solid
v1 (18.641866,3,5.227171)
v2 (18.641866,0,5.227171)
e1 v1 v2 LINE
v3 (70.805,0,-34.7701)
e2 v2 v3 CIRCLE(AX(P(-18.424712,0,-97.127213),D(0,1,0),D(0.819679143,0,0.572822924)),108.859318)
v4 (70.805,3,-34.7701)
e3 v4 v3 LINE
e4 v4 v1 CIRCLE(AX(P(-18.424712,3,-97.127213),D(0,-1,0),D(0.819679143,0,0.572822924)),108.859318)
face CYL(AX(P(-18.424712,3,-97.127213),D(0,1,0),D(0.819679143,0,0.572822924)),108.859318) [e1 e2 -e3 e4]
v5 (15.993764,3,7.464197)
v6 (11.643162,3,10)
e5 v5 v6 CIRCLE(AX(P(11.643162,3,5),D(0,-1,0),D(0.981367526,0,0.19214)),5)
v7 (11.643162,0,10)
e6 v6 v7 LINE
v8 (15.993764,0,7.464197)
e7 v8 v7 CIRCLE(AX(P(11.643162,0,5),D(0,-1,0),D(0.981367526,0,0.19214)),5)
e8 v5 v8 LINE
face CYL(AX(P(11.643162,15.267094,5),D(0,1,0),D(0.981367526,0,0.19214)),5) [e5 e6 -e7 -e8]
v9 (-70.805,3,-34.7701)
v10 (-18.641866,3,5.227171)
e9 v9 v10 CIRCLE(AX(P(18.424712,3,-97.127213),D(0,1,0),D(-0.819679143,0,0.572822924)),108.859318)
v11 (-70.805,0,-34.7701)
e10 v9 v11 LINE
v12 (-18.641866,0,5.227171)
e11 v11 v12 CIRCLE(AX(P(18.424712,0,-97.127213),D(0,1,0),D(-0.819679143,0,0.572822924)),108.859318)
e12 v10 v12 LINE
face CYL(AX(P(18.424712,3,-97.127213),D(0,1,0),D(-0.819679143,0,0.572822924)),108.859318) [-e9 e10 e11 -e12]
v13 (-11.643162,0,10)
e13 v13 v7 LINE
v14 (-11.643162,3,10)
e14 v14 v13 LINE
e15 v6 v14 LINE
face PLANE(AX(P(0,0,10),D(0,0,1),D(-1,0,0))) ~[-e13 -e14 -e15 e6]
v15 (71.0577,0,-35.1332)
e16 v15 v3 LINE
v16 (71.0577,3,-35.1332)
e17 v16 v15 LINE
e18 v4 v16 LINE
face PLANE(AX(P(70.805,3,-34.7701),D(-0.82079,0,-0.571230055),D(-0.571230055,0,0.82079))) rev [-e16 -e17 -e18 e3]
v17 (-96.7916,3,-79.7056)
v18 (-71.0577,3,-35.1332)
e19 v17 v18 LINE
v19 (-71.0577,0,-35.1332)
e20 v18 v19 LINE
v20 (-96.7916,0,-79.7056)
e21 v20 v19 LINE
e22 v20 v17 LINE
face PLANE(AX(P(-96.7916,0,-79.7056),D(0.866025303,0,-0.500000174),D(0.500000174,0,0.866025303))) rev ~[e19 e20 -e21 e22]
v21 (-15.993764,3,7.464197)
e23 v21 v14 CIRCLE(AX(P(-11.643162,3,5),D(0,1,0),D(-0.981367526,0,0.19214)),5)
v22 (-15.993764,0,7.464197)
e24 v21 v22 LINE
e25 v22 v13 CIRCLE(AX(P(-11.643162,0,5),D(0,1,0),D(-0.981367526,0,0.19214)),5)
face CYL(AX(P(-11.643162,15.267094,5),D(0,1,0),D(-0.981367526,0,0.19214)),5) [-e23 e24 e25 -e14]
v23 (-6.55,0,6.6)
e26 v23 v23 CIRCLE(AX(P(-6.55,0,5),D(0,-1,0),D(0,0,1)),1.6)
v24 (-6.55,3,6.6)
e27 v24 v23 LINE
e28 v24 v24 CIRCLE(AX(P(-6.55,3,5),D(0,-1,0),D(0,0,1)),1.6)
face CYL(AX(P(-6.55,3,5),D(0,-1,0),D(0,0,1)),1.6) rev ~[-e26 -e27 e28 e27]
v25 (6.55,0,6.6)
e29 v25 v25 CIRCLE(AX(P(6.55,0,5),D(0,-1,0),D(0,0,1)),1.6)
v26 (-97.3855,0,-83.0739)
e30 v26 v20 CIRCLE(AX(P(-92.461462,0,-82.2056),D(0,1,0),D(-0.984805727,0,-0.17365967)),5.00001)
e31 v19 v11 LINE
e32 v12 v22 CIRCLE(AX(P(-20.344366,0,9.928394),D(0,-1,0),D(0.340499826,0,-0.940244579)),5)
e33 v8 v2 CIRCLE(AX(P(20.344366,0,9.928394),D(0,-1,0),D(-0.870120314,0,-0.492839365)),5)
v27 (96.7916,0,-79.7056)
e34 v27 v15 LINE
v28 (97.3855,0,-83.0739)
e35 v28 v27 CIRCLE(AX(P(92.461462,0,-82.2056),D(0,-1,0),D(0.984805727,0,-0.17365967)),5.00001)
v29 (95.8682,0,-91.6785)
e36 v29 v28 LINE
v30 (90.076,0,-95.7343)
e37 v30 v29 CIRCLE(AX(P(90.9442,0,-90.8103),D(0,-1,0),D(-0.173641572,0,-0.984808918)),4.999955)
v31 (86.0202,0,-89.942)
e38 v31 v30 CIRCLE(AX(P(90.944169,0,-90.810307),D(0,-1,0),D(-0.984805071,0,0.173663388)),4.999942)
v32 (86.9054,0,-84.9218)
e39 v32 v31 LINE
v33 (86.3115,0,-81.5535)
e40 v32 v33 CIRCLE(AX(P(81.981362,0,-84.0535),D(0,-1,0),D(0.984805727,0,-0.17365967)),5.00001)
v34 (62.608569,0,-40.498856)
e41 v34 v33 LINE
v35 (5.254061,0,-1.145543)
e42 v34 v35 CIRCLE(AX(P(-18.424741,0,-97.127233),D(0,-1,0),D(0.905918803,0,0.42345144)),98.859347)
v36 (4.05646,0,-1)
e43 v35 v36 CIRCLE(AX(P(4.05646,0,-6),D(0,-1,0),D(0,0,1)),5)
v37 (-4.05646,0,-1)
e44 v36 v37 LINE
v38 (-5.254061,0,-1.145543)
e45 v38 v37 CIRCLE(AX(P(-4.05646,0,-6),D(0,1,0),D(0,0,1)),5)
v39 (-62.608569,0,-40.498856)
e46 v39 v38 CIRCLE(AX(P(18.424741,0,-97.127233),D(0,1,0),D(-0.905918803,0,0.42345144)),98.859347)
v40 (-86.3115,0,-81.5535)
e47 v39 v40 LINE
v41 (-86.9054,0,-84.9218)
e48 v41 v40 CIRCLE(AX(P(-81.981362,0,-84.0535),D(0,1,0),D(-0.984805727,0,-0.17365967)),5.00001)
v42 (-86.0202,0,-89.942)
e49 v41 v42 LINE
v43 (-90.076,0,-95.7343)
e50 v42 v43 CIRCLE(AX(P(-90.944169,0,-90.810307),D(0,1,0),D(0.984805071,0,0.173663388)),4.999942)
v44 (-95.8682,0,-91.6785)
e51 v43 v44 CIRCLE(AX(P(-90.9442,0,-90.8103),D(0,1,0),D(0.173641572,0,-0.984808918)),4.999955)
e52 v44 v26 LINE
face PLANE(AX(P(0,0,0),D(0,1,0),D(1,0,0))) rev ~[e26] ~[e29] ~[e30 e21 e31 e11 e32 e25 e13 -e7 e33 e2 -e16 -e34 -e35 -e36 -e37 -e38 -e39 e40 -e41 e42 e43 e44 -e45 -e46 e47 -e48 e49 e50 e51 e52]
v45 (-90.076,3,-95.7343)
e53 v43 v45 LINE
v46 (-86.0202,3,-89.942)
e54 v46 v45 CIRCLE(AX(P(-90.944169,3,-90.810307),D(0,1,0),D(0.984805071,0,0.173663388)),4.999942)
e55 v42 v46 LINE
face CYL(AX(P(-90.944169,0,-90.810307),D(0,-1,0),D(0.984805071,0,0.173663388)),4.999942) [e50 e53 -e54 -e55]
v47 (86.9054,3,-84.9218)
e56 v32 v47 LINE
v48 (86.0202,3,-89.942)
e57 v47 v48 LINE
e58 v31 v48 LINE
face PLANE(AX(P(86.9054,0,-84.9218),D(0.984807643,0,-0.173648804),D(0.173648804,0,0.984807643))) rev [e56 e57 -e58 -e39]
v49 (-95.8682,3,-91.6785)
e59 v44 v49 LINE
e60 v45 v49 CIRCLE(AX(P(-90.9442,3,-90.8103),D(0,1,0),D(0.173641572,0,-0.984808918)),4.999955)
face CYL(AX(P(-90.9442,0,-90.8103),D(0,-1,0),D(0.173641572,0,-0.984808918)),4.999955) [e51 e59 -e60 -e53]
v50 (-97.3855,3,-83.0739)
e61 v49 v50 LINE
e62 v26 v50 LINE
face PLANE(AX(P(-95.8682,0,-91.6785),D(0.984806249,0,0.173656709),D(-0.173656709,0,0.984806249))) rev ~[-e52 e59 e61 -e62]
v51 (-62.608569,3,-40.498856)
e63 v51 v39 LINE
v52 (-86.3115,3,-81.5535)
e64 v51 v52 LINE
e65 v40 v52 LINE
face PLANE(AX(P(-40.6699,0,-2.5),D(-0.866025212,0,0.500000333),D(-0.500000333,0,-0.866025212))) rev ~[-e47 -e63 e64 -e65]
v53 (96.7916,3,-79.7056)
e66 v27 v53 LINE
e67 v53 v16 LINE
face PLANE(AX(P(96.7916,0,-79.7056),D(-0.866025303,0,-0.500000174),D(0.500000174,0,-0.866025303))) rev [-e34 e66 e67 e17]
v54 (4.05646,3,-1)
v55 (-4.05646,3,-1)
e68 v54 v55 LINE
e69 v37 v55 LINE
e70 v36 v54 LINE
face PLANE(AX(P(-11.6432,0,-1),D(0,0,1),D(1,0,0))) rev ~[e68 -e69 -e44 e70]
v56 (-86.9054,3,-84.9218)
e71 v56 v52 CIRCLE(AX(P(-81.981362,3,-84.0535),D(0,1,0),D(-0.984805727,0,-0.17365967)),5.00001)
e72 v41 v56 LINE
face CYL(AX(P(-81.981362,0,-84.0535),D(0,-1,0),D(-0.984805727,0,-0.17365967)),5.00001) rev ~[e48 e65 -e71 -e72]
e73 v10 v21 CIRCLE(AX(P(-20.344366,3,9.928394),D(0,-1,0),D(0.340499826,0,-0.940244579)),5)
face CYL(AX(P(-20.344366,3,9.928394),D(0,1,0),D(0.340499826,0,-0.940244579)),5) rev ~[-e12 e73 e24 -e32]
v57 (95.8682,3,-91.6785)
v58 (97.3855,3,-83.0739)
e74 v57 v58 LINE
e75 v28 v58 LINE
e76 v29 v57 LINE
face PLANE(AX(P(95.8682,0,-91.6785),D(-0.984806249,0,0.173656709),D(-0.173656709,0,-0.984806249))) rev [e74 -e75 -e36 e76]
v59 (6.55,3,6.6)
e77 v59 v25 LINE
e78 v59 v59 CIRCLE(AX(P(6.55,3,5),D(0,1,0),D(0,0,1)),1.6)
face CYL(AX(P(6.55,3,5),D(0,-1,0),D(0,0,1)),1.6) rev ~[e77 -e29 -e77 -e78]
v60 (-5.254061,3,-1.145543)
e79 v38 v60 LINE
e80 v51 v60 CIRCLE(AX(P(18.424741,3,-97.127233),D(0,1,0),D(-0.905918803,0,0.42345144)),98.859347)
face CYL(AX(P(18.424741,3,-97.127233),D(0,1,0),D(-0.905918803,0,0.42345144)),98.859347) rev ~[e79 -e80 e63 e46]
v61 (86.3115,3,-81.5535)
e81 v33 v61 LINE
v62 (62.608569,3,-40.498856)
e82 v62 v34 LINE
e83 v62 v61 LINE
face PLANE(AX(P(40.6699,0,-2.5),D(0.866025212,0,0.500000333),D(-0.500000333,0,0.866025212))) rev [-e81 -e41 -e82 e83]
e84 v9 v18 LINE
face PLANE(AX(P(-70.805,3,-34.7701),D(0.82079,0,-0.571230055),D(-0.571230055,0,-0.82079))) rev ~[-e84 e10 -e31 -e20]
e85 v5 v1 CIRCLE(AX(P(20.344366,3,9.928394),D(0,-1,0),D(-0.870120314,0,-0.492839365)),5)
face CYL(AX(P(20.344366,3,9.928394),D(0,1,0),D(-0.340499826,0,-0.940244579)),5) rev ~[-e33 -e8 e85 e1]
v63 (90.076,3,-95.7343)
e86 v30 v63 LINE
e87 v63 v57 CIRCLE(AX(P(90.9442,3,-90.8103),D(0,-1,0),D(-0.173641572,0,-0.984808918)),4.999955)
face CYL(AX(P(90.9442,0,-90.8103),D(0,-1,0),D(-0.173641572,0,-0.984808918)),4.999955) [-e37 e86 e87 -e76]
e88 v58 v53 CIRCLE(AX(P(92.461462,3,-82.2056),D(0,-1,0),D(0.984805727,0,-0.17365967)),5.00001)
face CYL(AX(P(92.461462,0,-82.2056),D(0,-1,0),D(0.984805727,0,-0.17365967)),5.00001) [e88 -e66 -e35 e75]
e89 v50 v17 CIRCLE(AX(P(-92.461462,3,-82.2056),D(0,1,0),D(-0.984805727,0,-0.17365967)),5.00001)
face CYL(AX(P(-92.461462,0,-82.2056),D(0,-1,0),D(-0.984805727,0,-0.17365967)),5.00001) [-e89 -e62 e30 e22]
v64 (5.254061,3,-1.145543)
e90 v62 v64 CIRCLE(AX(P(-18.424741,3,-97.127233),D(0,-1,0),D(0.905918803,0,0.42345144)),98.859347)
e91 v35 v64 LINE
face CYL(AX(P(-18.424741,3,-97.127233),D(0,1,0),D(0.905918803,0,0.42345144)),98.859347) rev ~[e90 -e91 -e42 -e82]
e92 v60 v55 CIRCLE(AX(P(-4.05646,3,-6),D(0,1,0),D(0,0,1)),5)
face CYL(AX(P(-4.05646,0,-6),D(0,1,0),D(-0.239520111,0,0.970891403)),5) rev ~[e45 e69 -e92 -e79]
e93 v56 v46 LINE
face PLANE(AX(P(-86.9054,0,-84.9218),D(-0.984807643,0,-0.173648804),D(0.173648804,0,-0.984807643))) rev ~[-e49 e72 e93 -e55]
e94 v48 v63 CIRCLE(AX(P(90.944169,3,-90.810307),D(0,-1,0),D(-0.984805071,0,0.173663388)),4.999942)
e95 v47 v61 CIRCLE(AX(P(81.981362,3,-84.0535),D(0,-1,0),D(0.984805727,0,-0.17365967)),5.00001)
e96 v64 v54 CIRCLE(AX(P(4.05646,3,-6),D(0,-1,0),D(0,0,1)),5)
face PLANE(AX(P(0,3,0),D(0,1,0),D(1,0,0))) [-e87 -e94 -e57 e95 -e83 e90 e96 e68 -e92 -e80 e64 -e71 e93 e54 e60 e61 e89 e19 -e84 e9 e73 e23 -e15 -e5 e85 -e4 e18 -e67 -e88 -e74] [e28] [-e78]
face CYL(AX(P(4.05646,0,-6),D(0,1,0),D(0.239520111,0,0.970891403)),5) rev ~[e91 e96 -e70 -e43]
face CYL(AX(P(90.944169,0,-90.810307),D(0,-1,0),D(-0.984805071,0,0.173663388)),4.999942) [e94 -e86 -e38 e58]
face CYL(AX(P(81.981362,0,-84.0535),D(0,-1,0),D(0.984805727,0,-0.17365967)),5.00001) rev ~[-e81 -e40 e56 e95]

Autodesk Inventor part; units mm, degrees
ref_plane "YZ Plane" through (0, 0, 0) normal (1, 0, 0) x (0, 1, 0)
ref_plane "XZ Plane" through (0, 0, 0) normal (0, 1, 0) x (-1, 0, 0)
ref_plane "XY Plane" through (0, 0, 0) normal (0, 0, 1) x (1, 0, 0)
sketch "Sketch1" plane through (0, 0, 0) normal (0, 1, 0) x (-1, 0, 0)
  line L0 (0, 0) -> (0, 10)
  line L1 (0, 10) -> (42.1132, 10)
  line L2 (0, 0) -> (36.3397, 0)
  line L3 (40.6699, -2.5) -> (86.3115, -81.5535)
  line L4 (86.9054, -84.9218) -> (86.0202, -89.942)
  line L5 (90.076, -95.7343) -> (90.076, -95.7343)
  line L6 (95.8682, -91.6785) -> (97.3855, -83.0739)
  line L7 (96.7916, -79.7056) -> (46.4434, 7.5)
  arc A0 (45.5774, 9) -> (43.8453, 10) centre (43.8453, 8) ccw
  arc A1 (40.6699, -2.5) -> (36.3397, 0) centre (36.3397, -5) ccw
  arc A2 (86.9054, -84.9218) -> (86.3115, -81.5535) centre (81.9813, -84.0535) ccw
  arc A3 (97.3855, -83.0739) -> (96.7916, -79.7056) centre (92.4614, -82.2056) ccw
  arc A4 (46.4434, 7.5) -> (42.1132, 10) centre (42.1132, 5) ccw
  arc A5 (90.076, -95.7343) -> (95.8682, -91.6785) centre (90.9442, -90.8103) ccw
  arc A6 (86.0202, -89.942) -> (90.076, -95.7343) centre (90.9442, -90.8103) ccw
  point P0 (85.1519, -94.8661)
  point P1 (95, -96.6025)
  point P2 (45, 10)
  point P3 (90.076, -95.7343)
  dimension "d1" = 120
  dimension "d2" = 140
  dimension "d3" = 45
  dimension "d4" = 50
  dimension "d5" = 10
  dimension "d6" = 10
  dimension "d7" = 10
  dimension "d8" = 2
  dimension "d9" = 5
extrude "Extrusion1" add sketch "Sketch1" along normal blind 3
sketch "Sketch2" plane through (0, 3, 0) normal (0, 1, 0) x (1, 0, 0)
  line L0 (0, -10) -> (0, 0) projected
  line L1 (0, -5) -> (-25.3234, -5) construction
  point P0 (-6.55, -5)
  dimension "d19" = 6.55
hole "Hole1" at (-6.55, 3, 5) direction (0, -1, 0) diameter 3.2 end through all clearance for "Countersunk Flat Head Screw DIN EN ISO 2009" size "M3" standard "DIN"
mirror "Mirror1" about plane through (0, 0, 0) normal (1, 0, 0) of "Extrusion1", "Hole1"
sketch "Sketch3" plane through (0, 3, 0) normal (0, 1, 0) x (1, 0, 0)
  line L0 (-40.6699, 2.5) -> (-86.3115, 81.5535) projected
  line L1 (-36.3397, 0) -> (36.3397, 0) projected
  arc A0 (-71.1338, 55.2651) -> (0, 0) centre (18.4247, 97.1272) ccw
  line L2 (-40.6699, 2.5) -> (-86.3115, 81.5535) projected
  arc A1 (-40.6699, 2.5) -> (-36.3397, 0) centre (-36.3397, 5) ccw projected
  point P0 (-62.6082, 40.4983)
extrude "Extrusion2" add sketch "Sketch3" against normal up to surface (3 mm away) contours L0 A0 L1 A1
mirror "Mirror2" about plane through (0, 0, 0) normal (1, 0, 0) of "Extrusion2"
fillet "Fillet1" radius 5 1 edges at (0, 1.5, 0)
sketch "Sketch4" plane through (0, 3, 0) normal (0, 1, 0) x (1, 0, 0)
  arc A0 (-62.6082, 40.4983) -> (-0.9815, 0.1913) centre (18.4247, 97.1272) ccw projected
  arc A1 (-70.805, 34.7701) -> (-2.9445, -9.6141) centre (18.4247, 97.1272) ccw
  line L0 (-96.7916, 79.7056) -> (-46.4434, -7.5) projected
  arc A2 (-46.4434, -7.5) -> (-42.1132, -10) centre (-42.1132, -5) ccw projected
  line L1 (-42.1132, -10) -> (42.1132, -10) projected
  line L2 (-16.55, -5.9607) -> (-16.55, -10)
  circle A3 centre (-6.55, -5) radius 1.6 projected
  line L3 (-70.805, 34.7701) -> (-71.0577, 35.1332)
  point P0 (0, 0)
  point P1 (-16.55, -7.9804)
  dimension "d23" = 10
  dimension "d24" = 10
extrude "Extrusion3" cut sketch "Sketch4" against normal blind 10 contours A1 L2 L1 A2 L0 L3
fillet "Fillet2" radius 5 2 edges at (-16.55, 1.5, 5.9607) (-16.55, 1.5, 10)
mirror "Mirror3" about plane through (0, 0, 0) normal (1, 0, 0) of "Fillet2", "Extrusion3"
ref_plane "Work Plane1" through (-11.6432, 0, 0) normal (0, 0, 1) x (1, 0, 0)
sketch "Sketch5" plane through (-11.6432, 0, 0) normal (0, 0, 1) x (1, 0, 0)
  line L0 (0, 3) -> (23.2863, 3) projected
  line L1 (11.6432, 3) -> (11.6432, 0)
  line L2 (19.7932, 0) -> (16.5932, 0) projected
  line L3 (6.6932, 3) -> (16.5932, 3)
  line L4 (16.5932, 3) -> (16.5932, 0)
  line L5 (16.5932, 0) -> (6.6932, 0)
  line L6 (6.6932, 0) -> (6.6932, 3)
  line L7 (6.6932, 3) -> (16.5932, 0) construction
  line L8 (16.5932, 3) -> (6.6932, 0) construction
  point P0 (11.6432, 1.5)
extrude "Extrusion4" add sketch "Sketch5" against normal blind 1
fillet "Fillet3" radius 5 2 edges at (-4.6561, 1.5, -1) (4.6561, 1.5, -1)
properties part number "Claw1" material "Copper, Cast"
